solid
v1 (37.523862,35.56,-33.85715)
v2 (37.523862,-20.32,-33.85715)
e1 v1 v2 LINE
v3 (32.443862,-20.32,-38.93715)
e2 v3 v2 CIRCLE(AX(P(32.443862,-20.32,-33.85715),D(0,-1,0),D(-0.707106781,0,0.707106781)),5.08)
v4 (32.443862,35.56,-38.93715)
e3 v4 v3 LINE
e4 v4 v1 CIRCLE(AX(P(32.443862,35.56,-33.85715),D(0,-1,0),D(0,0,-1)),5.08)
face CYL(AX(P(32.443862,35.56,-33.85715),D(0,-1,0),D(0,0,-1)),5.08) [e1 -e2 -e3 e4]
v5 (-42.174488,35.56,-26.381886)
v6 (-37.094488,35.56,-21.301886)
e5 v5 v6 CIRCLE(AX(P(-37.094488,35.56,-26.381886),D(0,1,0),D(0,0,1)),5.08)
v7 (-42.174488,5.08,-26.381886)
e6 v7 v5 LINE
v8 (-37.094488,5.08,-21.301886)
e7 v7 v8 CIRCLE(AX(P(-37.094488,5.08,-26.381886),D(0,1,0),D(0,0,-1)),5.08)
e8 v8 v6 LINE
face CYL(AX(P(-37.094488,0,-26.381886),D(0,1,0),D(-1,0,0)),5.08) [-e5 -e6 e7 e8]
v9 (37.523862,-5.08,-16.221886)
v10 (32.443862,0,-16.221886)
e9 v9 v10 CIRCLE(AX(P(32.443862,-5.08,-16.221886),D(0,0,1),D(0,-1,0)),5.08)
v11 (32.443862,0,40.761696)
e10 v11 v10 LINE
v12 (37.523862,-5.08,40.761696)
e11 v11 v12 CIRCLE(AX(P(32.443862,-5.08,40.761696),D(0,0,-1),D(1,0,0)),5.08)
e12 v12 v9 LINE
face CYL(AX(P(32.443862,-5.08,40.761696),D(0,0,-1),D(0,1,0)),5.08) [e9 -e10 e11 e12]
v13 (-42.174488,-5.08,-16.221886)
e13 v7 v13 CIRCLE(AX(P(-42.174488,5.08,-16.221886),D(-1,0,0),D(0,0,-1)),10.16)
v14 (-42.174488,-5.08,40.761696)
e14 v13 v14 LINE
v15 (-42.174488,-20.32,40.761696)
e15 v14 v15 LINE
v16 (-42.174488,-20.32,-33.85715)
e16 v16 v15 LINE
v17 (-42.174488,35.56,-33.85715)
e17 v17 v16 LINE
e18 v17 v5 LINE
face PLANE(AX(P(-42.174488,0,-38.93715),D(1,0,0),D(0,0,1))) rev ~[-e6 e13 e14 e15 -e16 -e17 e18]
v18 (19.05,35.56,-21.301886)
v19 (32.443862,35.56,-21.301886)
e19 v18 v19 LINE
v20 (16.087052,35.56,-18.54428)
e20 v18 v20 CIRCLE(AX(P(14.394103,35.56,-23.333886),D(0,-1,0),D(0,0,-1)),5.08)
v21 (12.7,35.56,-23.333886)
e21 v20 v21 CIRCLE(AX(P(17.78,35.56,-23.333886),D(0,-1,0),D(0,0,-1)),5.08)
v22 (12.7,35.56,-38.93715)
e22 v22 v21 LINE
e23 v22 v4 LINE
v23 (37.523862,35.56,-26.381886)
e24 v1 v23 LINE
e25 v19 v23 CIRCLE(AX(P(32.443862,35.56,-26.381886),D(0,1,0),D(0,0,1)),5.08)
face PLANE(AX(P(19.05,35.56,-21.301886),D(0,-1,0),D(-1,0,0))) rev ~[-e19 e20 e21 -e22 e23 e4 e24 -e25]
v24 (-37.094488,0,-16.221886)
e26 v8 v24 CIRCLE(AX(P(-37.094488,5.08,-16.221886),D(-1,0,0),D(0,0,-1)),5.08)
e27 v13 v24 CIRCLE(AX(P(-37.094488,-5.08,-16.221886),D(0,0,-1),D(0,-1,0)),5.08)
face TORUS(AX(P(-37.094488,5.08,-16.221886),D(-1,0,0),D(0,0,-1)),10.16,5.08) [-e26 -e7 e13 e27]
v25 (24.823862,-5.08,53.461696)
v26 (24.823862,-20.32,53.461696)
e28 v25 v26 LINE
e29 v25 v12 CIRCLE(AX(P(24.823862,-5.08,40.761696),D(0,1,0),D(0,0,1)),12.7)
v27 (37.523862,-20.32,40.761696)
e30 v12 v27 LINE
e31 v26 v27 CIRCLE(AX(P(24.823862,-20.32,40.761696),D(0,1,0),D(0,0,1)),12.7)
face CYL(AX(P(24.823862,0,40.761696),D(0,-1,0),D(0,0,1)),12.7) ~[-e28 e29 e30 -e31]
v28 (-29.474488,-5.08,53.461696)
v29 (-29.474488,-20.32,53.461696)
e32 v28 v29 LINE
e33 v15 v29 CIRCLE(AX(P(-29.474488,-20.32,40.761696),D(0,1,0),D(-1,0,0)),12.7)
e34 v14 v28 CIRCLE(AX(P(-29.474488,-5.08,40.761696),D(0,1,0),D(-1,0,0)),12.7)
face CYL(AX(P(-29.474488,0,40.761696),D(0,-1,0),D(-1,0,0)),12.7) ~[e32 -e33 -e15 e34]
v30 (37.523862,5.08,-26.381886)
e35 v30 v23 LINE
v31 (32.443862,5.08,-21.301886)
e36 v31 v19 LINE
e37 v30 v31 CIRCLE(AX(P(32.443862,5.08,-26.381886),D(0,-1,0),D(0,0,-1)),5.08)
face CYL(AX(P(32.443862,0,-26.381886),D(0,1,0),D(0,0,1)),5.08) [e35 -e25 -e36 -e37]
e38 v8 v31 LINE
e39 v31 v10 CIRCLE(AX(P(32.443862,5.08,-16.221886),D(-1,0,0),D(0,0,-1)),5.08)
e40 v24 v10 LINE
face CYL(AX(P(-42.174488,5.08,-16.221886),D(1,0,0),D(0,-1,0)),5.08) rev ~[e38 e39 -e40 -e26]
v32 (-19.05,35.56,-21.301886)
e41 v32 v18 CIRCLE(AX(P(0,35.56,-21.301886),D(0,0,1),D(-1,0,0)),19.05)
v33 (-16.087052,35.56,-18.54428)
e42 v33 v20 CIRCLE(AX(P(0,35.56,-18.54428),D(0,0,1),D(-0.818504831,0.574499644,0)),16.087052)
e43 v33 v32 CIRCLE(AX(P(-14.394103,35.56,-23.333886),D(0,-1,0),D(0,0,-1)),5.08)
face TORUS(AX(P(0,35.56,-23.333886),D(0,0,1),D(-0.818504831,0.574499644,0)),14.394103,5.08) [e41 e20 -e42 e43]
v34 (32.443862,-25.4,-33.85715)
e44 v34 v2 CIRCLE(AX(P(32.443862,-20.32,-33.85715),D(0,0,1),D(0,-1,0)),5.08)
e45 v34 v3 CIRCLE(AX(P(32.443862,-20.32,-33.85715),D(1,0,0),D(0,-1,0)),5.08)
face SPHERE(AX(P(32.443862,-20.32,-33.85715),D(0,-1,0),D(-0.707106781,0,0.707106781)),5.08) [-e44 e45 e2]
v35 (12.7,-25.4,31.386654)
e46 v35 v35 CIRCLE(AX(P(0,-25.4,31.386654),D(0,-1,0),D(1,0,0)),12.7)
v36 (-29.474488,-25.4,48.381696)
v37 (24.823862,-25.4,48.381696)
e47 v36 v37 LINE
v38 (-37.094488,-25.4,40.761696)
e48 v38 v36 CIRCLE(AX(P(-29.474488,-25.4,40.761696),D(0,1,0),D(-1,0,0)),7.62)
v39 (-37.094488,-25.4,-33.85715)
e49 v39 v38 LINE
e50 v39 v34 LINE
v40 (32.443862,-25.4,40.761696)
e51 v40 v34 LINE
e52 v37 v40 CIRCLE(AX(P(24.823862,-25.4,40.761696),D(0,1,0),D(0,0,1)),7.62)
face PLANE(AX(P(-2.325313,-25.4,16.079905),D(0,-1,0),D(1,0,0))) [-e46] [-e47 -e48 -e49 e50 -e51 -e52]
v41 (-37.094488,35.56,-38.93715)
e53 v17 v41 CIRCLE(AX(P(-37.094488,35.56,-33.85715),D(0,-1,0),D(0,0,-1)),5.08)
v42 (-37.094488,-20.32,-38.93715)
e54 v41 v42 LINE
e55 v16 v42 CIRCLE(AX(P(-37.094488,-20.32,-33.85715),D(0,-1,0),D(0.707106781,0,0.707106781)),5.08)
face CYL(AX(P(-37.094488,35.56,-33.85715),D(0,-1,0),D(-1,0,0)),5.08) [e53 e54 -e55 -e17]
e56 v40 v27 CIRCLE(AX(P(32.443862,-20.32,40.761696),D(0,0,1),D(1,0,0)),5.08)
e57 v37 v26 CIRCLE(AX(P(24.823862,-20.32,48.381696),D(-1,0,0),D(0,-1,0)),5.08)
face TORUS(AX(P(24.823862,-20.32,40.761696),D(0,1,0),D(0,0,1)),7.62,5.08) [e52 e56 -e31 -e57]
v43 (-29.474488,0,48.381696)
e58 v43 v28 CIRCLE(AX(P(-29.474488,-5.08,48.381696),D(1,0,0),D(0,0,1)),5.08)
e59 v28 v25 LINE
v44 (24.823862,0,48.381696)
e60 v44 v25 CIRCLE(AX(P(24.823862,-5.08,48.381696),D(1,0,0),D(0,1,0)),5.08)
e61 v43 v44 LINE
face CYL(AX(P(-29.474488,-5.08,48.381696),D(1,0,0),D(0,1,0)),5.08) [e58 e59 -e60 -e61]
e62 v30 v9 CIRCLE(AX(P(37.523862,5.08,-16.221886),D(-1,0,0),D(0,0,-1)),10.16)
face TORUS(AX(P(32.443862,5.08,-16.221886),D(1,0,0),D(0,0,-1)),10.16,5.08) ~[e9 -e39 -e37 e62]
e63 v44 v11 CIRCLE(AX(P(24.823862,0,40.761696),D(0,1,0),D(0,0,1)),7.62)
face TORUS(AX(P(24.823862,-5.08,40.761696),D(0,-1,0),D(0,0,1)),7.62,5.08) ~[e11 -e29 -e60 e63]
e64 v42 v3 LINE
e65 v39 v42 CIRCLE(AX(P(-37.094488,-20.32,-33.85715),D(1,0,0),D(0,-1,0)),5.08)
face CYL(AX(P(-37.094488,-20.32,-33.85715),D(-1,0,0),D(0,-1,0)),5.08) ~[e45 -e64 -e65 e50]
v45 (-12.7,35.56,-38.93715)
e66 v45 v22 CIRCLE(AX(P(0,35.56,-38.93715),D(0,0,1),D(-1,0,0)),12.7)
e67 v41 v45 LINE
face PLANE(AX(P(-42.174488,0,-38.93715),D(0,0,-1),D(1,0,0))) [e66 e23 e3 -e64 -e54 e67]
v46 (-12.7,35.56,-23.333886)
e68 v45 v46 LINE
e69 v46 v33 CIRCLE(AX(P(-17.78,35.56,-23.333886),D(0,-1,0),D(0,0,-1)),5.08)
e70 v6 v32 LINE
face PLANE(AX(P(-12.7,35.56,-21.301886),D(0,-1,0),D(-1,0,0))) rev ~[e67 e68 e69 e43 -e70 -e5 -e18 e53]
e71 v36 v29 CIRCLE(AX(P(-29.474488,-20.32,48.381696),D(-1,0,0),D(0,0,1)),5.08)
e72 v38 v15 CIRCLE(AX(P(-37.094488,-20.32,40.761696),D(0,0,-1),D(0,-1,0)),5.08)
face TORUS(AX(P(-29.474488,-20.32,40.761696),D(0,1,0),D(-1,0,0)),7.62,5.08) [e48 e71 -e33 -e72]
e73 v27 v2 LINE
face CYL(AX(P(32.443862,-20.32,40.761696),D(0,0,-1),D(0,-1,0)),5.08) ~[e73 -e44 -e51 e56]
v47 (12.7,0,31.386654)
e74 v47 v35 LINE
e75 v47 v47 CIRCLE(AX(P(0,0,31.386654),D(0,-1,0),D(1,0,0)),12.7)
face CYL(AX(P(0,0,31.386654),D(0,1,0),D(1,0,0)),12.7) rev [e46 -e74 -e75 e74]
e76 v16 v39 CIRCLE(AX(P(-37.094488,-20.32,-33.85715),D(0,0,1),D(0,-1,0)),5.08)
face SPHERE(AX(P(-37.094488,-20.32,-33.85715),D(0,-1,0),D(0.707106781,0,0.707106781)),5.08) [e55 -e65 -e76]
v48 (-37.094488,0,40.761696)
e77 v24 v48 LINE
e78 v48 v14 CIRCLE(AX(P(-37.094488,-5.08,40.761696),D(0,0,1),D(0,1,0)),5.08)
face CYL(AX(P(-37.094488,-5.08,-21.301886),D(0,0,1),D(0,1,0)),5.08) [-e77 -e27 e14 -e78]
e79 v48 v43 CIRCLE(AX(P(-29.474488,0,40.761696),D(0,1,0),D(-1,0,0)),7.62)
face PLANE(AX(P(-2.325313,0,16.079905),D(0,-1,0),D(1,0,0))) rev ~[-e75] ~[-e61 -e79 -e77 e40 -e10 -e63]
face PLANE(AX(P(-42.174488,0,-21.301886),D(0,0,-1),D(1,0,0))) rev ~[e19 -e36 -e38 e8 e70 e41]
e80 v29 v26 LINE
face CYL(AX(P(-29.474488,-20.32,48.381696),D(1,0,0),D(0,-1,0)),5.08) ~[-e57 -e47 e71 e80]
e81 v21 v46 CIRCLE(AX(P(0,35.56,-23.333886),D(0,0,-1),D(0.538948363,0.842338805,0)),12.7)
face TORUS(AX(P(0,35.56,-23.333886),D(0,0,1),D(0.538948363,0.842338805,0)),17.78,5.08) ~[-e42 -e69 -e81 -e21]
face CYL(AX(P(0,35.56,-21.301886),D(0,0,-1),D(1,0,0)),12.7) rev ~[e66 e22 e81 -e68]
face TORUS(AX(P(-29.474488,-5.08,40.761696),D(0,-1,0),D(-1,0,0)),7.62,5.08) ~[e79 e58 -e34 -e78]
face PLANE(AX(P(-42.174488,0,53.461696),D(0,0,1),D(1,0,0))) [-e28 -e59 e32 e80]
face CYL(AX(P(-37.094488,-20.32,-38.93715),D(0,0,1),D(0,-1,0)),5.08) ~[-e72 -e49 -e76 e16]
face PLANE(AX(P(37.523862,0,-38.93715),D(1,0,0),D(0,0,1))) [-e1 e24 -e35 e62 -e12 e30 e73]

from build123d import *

# Parameters (mm, degrees)
F0_W         = 79.6983499915
F0_H         = 74.7635825602
F0_R         = 12.7
F0_H_2       = 17.6352638877
F1_DEPTH     = 25.4
F2_DEPTH     = 35.56
F4_DEPTH     = 17.6362638877
F5_R         = 12.7
F6_R         = 5.08
F7_T1_DEPTH  = 69.5383499915
F7_S5_W      = 5.08
F7_S5_H      = 5.08
F7_T6_DEPTH  = 5.08
F7_S11_W     = 5.08
F7_S11_H     = 5.08
F7_T12_DEPTH = 5.08
F8_DEPTH     = 3.048
F9_T2_ANGLE  = 250.1291990291
F9_T4_ANGLE  = 294.7758439205


# Not quite as in the source:
# - a fillet or chamfer that OpenCascade refuses, or shapes differently, is made with other operations: its cross-section is extruded or revolved along the edge and cut away or added


with BuildPart() as f1:
    # F0 (on Front) → F1 (new body)
    with BuildSketch(Plane.XZ):
        with Locations((-2.3253131658, 16.0799051921)):
            Rectangle(F0_W, F0_H)
        with Locations((0, 31.3866536387)):
            Circle(F0_R, mode=Mode.SUBTRACT)
        with Locations((-2.3253131658, -30.1195180319)):
            Rectangle(F0_W, F0_H_2)
    extrude(amount=F1_DEPTH)

    # F0 (on Front) → F2 (join)
    with BuildSketch(Plane.XZ):
        with Locations((-2.3253131658, -30.1195180319)):
            Rectangle(F0_W, F0_H_2)
    extrude(amount=-F2_DEPTH)

    # F3 (on face) → F4 (cut, through all)
    with BuildSketch(Plane.XY.offset(-21.3018860881)):
        with BuildLine():
            ThreePointArc((-12.7, 35.56), (0, 22.86), (12.7, 35.56))
            Line((12.7, 35.56), (-12.7, 35.56))
        make_face()
    extrude(amount=-F4_DEPTH, mode=Mode.SUBTRACT)

    # F5
    f5_edges = [f1.edges().sort_by_distance(p)[0] for p in [
        (-42.174488, -12.7, 53.461696),
        (37.523862, -12.7, 53.461696),
    ]]
    fillet(f5_edges, radius=F5_R)

    # F6
    f6_edges = [f1.edges().sort_by_distance(p)[0] for p in [
        (-2.325313, 0, 53.461696),
        (-2.325313, -25.4, 53.461696),
        (-42.174488, 0, 9.729905),
        (37.523862, 0, 9.729905),
        (-2.325313, 0, -21.301886),
        (37.523862, 17.78, -21.301886),
        (-42.174488, 17.78, -21.301886),
        (-42.174488, -25.4, 0.912273),
        (-42.174488, 5.08, -38.93715),
        (37.523862, -25.4, 0.912273),
        (37.523862, 5.08, -38.93715),
    ]]
    fillet(f6_edges, radius=F6_R)

    # F7: fillet of radius 5.08 on 1 edges, made by hand

    # F7_s2 → F7_t1 (cut)
    with BuildSketch(Plane.YZ.offset(-37.0944881615)):
        with BuildLine():
            ThreePointArc((-25.4, -33.8571499758), (-23.9121024484, -37.4492524242), (-20.32, -38.9371499758))
            Line((-20.32, -38.9371499758), (-25.4, -38.9371499758))
            Line((-25.4, -38.9371499758), (-25.4, -33.8571499758))
        make_face()
    extrude(amount=F7_T1_DEPTH, mode=Mode.SUBTRACT)


with BuildPart() as f7_tool4:
    # F7_s5 → F7_t6 (new body)
    with BuildSketch(Plane.XZ.offset(20.32)):
        with Locations((-39.6344881615, -36.3971499758)):
            Rectangle(F7_S5_W, F7_S5_H)
    extrude(amount=F7_T6_DEPTH)

    # F7_s7 → F7_t8 (revolve, cut)
    with BuildSketch(Plane(origin=(-37.0944881615, -20.32, -33.8571499758), x_dir=(0.7071067812, 0, 0.7071067812), z_dir=(0.7071067812, 0, -0.7071067812))):
        with BuildLine():
            ThreePointArc((0, -5.08), (5.08, 0), (0, 5.08))
            Line((0, 5.08), (0, -5.08))
        make_face()
    revolve(axis=Axis((-37.0944881615, -20.32, -33.8571499758), (0, -1, 0)), mode=Mode.SUBTRACT)


with BuildPart() as f1_1:
    add(f1.part)

    # F7_t3: cut F7_tool4
    add(f7_tool4.part, mode=Mode.SUBTRACT)


with BuildPart() as f7_tool10:
    # F7_s11 → F7_t12 (new body)
    with BuildSketch(Plane.XZ.offset(20.32)):
        with Locations((34.98386183, -36.3971499758)):
            Rectangle(F7_S11_W, F7_S11_H)
    extrude(amount=F7_T12_DEPTH)

    # F7_s13 → F7_t14 (revolve, cut)
    with BuildSketch(Plane(origin=(32.44386183, -20.32, -33.8571499758), x_dir=(-0.7071067812, 0, 0.7071067812), z_dir=(0.7071067812, 0, 0.7071067812))):
        with BuildLine():
            ThreePointArc((0, -5.08), (5.08, 0), (0, 5.08))
            Line((0, 5.08), (0, -5.08))
        make_face()
    revolve(axis=Axis((32.44386183, -20.32, -33.8571499758), (0, -1, 0)), mode=Mode.SUBTRACT)


with BuildPart() as f1_2:
    add(f1_1.part)

    # F7_t9: cut F7_tool10
    add(f7_tool10.part, mode=Mode.SUBTRACT)

    # F3 (on face) → F8 (join)
    with BuildSketch(Plane.XY.offset(-21.3018860881)):
        with BuildLine():
            Line((19.05, 35.56), (12.7, 35.56))
            ThreePointArc((12.7, 35.56), (0, 22.86), (-12.7, 35.56))
            Line((-12.7, 35.56), (-19.05, 35.56))
            ThreePointArc((-19.05, 35.56), (0, 16.51), (19.05, 35.56))
        make_face()
    extrude(amount=F8_DEPTH)

    # F9: fillet of radius 5.08 on 2 edges, made by hand

    # F9_s1 → F9_t2 (revolve, cut)
    with BuildSketch(Plane(origin=(16.7214049162, 23.823427639, 0), x_dir=(0, 0, 1), z_dir=(0.5744996444, 0.8185048311, 0))):
        with BuildLine():
            ThreePointArc((-21.3018860881, -39.4792073551), (-19.0836531533, -37.6057410411), (-18.2538860881, -34.823310449))
            Line((-18.2538860881, -34.823310449), (-18.2538860881, -39.4792073551))
            Line((-18.2538860881, -39.4792073551), (-21.3018860881, -39.4792073551))
        make_face()
    revolve(axis=Axis((0, 35.56, -18.2538860881), (0, 0, 1)), revolution_arc=F9_T2_ANGLE, mode=Mode.SUBTRACT)

    # F9_s3 → F9_t4 (revolve, cut)
    with BuildSketch(Plane(origin=(-16.14342639, 10.3289474307, 0), x_dir=(0, 0, 1), z_dir=(-0.8423388046, 0.5389483633, 0))):
        with BuildLine():
            ThreePointArc((-18.2538860881, 47.7335678904), (-19.7417836396, 44.141465442), (-23.3338860881, 42.6535678904))
            Line((-23.3338860881, 42.6535678904), (-18.2538860881, 42.6535678904))
            Line((-18.2538860881, 42.6535678904), (-18.2538860881, 47.7335678904))
        make_face()
    revolve(axis=Axis((0, 35.56, -18.2538860881), (0, 0, -1)), revolution_arc=F9_T4_ANGLE, mode=Mode.SUBTRACT)


solid = f1_2.part
